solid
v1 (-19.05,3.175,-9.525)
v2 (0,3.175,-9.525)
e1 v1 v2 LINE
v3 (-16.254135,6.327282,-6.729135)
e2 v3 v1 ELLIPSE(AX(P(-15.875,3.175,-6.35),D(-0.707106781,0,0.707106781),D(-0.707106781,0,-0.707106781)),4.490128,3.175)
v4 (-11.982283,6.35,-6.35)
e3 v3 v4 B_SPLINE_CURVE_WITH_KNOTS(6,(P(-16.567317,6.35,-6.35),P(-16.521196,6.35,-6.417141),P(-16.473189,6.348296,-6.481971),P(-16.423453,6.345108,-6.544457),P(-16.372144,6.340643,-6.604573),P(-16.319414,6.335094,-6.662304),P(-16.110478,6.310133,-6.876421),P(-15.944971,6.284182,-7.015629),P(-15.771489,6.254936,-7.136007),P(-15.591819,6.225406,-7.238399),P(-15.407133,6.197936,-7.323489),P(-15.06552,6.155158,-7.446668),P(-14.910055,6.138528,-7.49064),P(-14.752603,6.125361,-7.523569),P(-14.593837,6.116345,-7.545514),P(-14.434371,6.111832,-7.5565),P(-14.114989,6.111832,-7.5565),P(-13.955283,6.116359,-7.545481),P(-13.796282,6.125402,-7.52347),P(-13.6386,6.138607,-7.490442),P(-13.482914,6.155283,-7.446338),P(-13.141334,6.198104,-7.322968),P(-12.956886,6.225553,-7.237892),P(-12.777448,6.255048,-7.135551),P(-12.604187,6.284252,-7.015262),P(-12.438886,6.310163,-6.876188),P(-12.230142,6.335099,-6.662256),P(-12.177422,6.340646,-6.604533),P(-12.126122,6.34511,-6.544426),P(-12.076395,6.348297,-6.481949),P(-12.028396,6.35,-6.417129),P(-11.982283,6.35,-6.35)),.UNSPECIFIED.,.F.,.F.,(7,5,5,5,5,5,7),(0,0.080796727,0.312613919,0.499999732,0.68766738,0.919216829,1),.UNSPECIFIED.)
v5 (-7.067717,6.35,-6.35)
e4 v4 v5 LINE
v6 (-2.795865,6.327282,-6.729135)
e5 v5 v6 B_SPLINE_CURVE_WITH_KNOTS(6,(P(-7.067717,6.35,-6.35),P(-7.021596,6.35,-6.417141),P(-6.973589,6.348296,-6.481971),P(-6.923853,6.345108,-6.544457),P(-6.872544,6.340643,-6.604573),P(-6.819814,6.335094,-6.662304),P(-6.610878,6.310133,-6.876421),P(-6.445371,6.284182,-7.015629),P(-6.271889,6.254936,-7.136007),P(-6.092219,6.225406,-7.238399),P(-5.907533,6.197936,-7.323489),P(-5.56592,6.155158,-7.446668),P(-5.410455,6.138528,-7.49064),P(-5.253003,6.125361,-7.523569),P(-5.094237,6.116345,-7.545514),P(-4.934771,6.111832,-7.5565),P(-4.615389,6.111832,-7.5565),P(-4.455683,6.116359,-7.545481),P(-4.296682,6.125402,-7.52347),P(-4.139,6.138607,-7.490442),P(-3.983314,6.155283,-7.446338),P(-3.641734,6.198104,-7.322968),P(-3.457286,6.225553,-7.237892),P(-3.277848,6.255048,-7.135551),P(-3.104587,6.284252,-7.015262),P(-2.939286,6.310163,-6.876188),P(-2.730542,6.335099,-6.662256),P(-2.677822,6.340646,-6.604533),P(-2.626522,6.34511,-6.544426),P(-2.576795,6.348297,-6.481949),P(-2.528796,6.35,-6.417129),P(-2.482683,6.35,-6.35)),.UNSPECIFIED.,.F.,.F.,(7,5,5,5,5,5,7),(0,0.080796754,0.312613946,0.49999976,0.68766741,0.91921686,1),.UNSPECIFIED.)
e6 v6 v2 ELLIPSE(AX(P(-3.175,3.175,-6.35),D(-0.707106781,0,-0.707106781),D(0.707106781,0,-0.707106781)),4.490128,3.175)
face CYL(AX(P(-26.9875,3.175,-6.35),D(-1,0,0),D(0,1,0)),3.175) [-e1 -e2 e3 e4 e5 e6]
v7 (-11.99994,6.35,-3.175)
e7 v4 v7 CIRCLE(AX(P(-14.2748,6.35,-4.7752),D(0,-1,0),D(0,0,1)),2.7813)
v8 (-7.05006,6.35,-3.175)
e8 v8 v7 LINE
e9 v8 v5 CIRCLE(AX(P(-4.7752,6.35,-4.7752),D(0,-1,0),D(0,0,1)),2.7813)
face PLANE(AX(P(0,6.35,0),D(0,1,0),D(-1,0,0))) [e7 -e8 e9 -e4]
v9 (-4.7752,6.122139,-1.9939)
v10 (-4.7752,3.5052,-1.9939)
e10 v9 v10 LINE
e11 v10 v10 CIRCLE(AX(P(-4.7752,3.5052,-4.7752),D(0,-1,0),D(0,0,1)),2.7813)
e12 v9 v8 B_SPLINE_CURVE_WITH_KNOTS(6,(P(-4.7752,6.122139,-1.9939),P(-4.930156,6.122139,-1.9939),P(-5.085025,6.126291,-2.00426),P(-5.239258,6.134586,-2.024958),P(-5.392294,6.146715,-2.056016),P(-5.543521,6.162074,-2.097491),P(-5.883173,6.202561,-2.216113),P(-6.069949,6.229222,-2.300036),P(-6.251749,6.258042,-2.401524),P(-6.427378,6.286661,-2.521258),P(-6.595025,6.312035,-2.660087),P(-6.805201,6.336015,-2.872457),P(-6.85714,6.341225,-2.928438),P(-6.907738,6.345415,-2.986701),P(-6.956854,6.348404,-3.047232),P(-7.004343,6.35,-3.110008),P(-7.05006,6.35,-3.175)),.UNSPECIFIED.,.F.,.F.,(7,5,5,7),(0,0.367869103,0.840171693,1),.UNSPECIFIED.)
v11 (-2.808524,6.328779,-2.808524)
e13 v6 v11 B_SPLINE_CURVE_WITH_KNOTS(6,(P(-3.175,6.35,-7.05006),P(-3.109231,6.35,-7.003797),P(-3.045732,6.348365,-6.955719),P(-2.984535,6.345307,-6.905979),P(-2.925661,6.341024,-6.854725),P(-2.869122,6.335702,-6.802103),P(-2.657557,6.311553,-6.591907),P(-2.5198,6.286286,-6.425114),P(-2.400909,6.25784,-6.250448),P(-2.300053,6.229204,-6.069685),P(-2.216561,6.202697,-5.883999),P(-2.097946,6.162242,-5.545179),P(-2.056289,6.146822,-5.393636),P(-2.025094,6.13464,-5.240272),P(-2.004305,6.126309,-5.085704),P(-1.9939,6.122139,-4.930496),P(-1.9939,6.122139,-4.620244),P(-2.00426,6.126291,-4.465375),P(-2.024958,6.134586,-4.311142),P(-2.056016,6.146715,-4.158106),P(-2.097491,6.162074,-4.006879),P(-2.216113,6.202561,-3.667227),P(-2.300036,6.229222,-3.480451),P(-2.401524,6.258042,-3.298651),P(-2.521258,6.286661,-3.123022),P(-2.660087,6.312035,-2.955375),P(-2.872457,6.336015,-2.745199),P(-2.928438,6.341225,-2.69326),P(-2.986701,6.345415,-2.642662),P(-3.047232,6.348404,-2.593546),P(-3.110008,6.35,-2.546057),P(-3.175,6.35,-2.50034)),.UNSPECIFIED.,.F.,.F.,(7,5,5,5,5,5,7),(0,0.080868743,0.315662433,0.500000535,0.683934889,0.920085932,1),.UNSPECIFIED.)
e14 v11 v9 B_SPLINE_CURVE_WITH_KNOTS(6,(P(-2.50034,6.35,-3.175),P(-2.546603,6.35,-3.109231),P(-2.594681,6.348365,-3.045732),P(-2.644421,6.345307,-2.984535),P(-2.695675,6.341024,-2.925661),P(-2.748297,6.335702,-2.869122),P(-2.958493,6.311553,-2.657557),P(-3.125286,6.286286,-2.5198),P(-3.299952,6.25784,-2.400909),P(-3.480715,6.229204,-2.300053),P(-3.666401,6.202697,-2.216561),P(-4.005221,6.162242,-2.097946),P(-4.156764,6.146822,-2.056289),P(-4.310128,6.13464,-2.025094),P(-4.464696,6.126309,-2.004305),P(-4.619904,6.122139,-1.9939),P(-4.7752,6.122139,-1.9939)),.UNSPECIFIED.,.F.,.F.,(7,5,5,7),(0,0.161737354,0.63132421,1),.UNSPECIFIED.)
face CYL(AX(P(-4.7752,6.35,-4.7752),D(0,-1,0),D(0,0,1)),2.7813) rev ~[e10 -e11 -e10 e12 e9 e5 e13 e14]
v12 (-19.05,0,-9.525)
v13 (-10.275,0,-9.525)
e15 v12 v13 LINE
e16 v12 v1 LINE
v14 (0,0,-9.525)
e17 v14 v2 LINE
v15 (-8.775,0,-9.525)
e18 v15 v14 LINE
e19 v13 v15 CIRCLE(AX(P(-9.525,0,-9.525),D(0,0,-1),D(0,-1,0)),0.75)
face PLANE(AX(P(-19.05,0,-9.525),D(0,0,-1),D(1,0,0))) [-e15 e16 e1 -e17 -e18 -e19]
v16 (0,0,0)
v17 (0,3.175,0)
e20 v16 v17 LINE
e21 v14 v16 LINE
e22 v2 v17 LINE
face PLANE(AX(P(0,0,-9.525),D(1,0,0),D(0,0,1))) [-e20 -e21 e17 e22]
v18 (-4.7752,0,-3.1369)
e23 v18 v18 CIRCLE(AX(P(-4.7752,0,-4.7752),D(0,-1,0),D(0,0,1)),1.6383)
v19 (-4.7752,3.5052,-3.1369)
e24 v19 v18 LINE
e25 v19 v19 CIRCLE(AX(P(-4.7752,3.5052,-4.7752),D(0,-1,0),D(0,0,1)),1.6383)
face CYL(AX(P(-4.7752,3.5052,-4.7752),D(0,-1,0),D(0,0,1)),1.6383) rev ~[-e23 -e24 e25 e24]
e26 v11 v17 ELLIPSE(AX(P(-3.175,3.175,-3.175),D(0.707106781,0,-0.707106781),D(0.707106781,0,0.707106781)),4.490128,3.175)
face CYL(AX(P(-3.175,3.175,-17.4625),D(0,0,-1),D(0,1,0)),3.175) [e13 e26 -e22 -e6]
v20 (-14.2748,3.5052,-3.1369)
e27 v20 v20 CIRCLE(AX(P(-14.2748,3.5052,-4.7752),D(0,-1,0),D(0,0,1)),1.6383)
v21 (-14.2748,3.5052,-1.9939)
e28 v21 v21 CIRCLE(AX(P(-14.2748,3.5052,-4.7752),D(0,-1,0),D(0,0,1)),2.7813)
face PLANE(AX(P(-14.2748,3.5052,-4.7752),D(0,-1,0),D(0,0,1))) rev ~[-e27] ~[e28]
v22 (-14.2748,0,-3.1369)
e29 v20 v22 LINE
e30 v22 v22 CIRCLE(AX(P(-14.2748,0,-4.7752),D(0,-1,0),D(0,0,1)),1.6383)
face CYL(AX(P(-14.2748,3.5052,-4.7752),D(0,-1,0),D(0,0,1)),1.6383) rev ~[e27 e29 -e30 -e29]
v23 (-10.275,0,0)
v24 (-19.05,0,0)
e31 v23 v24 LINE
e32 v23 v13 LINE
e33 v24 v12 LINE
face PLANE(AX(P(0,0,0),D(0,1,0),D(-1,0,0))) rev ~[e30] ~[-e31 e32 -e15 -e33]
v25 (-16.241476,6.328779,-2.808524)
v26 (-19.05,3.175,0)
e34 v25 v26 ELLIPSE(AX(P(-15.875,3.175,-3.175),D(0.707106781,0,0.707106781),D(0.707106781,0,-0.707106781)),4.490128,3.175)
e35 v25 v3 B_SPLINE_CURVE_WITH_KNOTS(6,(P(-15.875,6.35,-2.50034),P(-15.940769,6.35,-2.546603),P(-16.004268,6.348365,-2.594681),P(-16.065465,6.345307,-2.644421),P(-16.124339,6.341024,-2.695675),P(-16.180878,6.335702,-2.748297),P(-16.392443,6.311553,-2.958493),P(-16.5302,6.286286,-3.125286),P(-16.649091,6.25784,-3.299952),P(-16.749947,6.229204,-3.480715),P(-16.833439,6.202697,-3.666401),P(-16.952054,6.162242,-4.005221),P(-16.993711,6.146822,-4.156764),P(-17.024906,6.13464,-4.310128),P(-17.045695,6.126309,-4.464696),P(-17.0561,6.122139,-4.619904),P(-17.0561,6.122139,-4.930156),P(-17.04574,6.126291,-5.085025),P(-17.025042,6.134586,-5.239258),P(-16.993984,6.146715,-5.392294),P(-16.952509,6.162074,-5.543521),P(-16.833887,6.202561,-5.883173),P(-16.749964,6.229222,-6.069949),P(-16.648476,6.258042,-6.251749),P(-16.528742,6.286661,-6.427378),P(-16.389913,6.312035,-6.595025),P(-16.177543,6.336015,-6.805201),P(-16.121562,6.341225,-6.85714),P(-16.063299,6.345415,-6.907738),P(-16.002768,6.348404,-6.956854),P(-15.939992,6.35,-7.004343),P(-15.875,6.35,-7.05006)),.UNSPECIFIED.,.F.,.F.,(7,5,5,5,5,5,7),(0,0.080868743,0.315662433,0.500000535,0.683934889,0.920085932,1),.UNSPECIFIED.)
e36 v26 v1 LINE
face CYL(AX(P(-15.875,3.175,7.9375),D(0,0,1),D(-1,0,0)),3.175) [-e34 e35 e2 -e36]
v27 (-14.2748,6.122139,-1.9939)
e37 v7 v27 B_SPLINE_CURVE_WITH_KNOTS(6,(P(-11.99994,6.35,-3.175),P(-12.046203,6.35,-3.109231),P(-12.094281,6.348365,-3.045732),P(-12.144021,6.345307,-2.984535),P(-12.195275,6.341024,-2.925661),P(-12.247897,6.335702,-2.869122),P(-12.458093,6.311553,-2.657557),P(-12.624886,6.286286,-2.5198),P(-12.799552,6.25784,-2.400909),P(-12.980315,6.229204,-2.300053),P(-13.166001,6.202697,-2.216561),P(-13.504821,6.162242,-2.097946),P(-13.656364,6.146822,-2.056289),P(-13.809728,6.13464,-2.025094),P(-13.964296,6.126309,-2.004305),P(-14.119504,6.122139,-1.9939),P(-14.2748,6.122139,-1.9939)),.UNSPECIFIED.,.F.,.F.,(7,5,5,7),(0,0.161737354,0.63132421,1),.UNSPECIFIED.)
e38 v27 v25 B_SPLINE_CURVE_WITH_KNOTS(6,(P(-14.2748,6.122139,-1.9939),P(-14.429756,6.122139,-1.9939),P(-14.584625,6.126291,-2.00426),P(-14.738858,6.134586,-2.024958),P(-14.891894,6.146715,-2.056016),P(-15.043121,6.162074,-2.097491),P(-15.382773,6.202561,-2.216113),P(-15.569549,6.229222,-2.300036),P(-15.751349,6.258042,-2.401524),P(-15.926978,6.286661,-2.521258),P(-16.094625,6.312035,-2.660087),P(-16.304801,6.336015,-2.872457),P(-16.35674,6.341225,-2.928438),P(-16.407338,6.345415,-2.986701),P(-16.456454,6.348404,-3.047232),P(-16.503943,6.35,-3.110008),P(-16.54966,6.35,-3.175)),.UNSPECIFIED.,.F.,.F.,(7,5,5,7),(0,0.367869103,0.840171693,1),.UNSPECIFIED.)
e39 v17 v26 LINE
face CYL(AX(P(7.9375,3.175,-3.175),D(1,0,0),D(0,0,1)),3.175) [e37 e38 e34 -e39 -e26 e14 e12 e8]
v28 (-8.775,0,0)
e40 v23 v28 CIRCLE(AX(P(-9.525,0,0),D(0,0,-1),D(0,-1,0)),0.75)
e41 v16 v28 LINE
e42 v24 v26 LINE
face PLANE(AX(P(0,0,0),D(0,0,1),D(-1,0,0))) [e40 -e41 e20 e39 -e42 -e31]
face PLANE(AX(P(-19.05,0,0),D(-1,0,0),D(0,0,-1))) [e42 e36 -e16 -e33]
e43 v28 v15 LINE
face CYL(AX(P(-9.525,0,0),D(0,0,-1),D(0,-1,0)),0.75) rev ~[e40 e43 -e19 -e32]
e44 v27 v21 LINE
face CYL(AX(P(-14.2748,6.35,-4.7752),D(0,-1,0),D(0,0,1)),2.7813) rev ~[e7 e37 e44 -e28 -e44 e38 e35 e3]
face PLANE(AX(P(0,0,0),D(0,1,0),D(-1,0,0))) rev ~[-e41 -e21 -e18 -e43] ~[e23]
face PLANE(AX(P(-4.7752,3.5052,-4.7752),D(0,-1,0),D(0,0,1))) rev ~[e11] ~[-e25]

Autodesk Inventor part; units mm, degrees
ref_plane "YZ Plane" through (0, 0, 0) normal (1, 0, 0) x (0, 1, 0)
ref_plane "XZ Plane" through (0, 0, 0) normal (0, 1, 0) x (-1, 0, 0)
ref_plane "XY Plane" through (0, 0, 0) normal (0, 0, 1) x (1, 0, 0)
sketch "Sketch1" plane through (0, 0, 0) normal (0, 1, 0) x (-1, 0, 0)
  line L0 (0, 0) -> (19.05, 0)
  line L1 (19.05, 0) -> (19.05, -9.525)
  line L2 (19.05, -9.525) -> (0, -9.525)
  line L3 (0, -9.525) -> (0, 0)
  dimension "d0" = 19.05
  dimension "d1" = 9.525
extrude "Extrusion1" add sketch "Sketch1" along normal blind 6.35
sketch "Sketch2" plane through (-19.05, 0, 0) normal (0, 0, 1) x (1, 0, 0)
  line L0 (19.05, 0) -> (0, 0) projected
  point P0 (9.525, 0)
hole "Hole1" at (-9.525, 0, 0) direction (0, 0, -1) diameter 1.5 end through all
sketch "Sketch3" plane through (0, 6.35, 0) normal (0, 1, 0) x (1, 0, 0)
  line L0 (-19.05, 0) -> (-10.275, 0) projected
  line L1 (-19.05, 0) -> (-14.2748, 0)
  line L2 (-14.2748, 0) -> (-14.2748, 4.7752)
  line L3 (-14.2748, 4.7752) -> (-19.05, 4.7752)
  line L4 (-19.05, 4.7752) -> (-19.05, 0)
  line L5 (-19.05, 0) -> (0, 0) projected
  line L6 (0, 0) -> (-4.7752, 0)
  line L7 (-4.7752, 0) -> (-4.7752, 4.7752)
  line L8 (-4.7752, 4.7752) -> (0, 4.7752)
  line L9 (0, 4.7752) -> (0, 0)
  dimension "d11" = 4.7752
  dimension "d12" = 4.7752
  dimension "d13" = 4.7752
  dimension "d14" = 4.7752
hole "Hole2" at (-14.2748, 6.35, -4.7752) at (-4.7752, 6.35, -4.7752) direction (0, -1, 0) diameter 3.2766 end through all counterbore diameter 5.5626 counterbore depth 2.8448 clearance for "Socket Head Cap Screw" size "#4" standard "Ansi Unified Screw Threads"
sketch "Sketch4" plane through (0, 0, 0) normal (1, 0, 0) x (0, 0, -1)
  point P0 (0, 0)
fillet "Fillet1" radius 3.175 4 edges at (-9.525, 6.35, 0) (0, 6.35, -4.7625) (-9.525, 6.35, -9.525) (-19.05, 6.35, -4.7625)
properties part number "Top clamp for capillary jig - thermal seal"
